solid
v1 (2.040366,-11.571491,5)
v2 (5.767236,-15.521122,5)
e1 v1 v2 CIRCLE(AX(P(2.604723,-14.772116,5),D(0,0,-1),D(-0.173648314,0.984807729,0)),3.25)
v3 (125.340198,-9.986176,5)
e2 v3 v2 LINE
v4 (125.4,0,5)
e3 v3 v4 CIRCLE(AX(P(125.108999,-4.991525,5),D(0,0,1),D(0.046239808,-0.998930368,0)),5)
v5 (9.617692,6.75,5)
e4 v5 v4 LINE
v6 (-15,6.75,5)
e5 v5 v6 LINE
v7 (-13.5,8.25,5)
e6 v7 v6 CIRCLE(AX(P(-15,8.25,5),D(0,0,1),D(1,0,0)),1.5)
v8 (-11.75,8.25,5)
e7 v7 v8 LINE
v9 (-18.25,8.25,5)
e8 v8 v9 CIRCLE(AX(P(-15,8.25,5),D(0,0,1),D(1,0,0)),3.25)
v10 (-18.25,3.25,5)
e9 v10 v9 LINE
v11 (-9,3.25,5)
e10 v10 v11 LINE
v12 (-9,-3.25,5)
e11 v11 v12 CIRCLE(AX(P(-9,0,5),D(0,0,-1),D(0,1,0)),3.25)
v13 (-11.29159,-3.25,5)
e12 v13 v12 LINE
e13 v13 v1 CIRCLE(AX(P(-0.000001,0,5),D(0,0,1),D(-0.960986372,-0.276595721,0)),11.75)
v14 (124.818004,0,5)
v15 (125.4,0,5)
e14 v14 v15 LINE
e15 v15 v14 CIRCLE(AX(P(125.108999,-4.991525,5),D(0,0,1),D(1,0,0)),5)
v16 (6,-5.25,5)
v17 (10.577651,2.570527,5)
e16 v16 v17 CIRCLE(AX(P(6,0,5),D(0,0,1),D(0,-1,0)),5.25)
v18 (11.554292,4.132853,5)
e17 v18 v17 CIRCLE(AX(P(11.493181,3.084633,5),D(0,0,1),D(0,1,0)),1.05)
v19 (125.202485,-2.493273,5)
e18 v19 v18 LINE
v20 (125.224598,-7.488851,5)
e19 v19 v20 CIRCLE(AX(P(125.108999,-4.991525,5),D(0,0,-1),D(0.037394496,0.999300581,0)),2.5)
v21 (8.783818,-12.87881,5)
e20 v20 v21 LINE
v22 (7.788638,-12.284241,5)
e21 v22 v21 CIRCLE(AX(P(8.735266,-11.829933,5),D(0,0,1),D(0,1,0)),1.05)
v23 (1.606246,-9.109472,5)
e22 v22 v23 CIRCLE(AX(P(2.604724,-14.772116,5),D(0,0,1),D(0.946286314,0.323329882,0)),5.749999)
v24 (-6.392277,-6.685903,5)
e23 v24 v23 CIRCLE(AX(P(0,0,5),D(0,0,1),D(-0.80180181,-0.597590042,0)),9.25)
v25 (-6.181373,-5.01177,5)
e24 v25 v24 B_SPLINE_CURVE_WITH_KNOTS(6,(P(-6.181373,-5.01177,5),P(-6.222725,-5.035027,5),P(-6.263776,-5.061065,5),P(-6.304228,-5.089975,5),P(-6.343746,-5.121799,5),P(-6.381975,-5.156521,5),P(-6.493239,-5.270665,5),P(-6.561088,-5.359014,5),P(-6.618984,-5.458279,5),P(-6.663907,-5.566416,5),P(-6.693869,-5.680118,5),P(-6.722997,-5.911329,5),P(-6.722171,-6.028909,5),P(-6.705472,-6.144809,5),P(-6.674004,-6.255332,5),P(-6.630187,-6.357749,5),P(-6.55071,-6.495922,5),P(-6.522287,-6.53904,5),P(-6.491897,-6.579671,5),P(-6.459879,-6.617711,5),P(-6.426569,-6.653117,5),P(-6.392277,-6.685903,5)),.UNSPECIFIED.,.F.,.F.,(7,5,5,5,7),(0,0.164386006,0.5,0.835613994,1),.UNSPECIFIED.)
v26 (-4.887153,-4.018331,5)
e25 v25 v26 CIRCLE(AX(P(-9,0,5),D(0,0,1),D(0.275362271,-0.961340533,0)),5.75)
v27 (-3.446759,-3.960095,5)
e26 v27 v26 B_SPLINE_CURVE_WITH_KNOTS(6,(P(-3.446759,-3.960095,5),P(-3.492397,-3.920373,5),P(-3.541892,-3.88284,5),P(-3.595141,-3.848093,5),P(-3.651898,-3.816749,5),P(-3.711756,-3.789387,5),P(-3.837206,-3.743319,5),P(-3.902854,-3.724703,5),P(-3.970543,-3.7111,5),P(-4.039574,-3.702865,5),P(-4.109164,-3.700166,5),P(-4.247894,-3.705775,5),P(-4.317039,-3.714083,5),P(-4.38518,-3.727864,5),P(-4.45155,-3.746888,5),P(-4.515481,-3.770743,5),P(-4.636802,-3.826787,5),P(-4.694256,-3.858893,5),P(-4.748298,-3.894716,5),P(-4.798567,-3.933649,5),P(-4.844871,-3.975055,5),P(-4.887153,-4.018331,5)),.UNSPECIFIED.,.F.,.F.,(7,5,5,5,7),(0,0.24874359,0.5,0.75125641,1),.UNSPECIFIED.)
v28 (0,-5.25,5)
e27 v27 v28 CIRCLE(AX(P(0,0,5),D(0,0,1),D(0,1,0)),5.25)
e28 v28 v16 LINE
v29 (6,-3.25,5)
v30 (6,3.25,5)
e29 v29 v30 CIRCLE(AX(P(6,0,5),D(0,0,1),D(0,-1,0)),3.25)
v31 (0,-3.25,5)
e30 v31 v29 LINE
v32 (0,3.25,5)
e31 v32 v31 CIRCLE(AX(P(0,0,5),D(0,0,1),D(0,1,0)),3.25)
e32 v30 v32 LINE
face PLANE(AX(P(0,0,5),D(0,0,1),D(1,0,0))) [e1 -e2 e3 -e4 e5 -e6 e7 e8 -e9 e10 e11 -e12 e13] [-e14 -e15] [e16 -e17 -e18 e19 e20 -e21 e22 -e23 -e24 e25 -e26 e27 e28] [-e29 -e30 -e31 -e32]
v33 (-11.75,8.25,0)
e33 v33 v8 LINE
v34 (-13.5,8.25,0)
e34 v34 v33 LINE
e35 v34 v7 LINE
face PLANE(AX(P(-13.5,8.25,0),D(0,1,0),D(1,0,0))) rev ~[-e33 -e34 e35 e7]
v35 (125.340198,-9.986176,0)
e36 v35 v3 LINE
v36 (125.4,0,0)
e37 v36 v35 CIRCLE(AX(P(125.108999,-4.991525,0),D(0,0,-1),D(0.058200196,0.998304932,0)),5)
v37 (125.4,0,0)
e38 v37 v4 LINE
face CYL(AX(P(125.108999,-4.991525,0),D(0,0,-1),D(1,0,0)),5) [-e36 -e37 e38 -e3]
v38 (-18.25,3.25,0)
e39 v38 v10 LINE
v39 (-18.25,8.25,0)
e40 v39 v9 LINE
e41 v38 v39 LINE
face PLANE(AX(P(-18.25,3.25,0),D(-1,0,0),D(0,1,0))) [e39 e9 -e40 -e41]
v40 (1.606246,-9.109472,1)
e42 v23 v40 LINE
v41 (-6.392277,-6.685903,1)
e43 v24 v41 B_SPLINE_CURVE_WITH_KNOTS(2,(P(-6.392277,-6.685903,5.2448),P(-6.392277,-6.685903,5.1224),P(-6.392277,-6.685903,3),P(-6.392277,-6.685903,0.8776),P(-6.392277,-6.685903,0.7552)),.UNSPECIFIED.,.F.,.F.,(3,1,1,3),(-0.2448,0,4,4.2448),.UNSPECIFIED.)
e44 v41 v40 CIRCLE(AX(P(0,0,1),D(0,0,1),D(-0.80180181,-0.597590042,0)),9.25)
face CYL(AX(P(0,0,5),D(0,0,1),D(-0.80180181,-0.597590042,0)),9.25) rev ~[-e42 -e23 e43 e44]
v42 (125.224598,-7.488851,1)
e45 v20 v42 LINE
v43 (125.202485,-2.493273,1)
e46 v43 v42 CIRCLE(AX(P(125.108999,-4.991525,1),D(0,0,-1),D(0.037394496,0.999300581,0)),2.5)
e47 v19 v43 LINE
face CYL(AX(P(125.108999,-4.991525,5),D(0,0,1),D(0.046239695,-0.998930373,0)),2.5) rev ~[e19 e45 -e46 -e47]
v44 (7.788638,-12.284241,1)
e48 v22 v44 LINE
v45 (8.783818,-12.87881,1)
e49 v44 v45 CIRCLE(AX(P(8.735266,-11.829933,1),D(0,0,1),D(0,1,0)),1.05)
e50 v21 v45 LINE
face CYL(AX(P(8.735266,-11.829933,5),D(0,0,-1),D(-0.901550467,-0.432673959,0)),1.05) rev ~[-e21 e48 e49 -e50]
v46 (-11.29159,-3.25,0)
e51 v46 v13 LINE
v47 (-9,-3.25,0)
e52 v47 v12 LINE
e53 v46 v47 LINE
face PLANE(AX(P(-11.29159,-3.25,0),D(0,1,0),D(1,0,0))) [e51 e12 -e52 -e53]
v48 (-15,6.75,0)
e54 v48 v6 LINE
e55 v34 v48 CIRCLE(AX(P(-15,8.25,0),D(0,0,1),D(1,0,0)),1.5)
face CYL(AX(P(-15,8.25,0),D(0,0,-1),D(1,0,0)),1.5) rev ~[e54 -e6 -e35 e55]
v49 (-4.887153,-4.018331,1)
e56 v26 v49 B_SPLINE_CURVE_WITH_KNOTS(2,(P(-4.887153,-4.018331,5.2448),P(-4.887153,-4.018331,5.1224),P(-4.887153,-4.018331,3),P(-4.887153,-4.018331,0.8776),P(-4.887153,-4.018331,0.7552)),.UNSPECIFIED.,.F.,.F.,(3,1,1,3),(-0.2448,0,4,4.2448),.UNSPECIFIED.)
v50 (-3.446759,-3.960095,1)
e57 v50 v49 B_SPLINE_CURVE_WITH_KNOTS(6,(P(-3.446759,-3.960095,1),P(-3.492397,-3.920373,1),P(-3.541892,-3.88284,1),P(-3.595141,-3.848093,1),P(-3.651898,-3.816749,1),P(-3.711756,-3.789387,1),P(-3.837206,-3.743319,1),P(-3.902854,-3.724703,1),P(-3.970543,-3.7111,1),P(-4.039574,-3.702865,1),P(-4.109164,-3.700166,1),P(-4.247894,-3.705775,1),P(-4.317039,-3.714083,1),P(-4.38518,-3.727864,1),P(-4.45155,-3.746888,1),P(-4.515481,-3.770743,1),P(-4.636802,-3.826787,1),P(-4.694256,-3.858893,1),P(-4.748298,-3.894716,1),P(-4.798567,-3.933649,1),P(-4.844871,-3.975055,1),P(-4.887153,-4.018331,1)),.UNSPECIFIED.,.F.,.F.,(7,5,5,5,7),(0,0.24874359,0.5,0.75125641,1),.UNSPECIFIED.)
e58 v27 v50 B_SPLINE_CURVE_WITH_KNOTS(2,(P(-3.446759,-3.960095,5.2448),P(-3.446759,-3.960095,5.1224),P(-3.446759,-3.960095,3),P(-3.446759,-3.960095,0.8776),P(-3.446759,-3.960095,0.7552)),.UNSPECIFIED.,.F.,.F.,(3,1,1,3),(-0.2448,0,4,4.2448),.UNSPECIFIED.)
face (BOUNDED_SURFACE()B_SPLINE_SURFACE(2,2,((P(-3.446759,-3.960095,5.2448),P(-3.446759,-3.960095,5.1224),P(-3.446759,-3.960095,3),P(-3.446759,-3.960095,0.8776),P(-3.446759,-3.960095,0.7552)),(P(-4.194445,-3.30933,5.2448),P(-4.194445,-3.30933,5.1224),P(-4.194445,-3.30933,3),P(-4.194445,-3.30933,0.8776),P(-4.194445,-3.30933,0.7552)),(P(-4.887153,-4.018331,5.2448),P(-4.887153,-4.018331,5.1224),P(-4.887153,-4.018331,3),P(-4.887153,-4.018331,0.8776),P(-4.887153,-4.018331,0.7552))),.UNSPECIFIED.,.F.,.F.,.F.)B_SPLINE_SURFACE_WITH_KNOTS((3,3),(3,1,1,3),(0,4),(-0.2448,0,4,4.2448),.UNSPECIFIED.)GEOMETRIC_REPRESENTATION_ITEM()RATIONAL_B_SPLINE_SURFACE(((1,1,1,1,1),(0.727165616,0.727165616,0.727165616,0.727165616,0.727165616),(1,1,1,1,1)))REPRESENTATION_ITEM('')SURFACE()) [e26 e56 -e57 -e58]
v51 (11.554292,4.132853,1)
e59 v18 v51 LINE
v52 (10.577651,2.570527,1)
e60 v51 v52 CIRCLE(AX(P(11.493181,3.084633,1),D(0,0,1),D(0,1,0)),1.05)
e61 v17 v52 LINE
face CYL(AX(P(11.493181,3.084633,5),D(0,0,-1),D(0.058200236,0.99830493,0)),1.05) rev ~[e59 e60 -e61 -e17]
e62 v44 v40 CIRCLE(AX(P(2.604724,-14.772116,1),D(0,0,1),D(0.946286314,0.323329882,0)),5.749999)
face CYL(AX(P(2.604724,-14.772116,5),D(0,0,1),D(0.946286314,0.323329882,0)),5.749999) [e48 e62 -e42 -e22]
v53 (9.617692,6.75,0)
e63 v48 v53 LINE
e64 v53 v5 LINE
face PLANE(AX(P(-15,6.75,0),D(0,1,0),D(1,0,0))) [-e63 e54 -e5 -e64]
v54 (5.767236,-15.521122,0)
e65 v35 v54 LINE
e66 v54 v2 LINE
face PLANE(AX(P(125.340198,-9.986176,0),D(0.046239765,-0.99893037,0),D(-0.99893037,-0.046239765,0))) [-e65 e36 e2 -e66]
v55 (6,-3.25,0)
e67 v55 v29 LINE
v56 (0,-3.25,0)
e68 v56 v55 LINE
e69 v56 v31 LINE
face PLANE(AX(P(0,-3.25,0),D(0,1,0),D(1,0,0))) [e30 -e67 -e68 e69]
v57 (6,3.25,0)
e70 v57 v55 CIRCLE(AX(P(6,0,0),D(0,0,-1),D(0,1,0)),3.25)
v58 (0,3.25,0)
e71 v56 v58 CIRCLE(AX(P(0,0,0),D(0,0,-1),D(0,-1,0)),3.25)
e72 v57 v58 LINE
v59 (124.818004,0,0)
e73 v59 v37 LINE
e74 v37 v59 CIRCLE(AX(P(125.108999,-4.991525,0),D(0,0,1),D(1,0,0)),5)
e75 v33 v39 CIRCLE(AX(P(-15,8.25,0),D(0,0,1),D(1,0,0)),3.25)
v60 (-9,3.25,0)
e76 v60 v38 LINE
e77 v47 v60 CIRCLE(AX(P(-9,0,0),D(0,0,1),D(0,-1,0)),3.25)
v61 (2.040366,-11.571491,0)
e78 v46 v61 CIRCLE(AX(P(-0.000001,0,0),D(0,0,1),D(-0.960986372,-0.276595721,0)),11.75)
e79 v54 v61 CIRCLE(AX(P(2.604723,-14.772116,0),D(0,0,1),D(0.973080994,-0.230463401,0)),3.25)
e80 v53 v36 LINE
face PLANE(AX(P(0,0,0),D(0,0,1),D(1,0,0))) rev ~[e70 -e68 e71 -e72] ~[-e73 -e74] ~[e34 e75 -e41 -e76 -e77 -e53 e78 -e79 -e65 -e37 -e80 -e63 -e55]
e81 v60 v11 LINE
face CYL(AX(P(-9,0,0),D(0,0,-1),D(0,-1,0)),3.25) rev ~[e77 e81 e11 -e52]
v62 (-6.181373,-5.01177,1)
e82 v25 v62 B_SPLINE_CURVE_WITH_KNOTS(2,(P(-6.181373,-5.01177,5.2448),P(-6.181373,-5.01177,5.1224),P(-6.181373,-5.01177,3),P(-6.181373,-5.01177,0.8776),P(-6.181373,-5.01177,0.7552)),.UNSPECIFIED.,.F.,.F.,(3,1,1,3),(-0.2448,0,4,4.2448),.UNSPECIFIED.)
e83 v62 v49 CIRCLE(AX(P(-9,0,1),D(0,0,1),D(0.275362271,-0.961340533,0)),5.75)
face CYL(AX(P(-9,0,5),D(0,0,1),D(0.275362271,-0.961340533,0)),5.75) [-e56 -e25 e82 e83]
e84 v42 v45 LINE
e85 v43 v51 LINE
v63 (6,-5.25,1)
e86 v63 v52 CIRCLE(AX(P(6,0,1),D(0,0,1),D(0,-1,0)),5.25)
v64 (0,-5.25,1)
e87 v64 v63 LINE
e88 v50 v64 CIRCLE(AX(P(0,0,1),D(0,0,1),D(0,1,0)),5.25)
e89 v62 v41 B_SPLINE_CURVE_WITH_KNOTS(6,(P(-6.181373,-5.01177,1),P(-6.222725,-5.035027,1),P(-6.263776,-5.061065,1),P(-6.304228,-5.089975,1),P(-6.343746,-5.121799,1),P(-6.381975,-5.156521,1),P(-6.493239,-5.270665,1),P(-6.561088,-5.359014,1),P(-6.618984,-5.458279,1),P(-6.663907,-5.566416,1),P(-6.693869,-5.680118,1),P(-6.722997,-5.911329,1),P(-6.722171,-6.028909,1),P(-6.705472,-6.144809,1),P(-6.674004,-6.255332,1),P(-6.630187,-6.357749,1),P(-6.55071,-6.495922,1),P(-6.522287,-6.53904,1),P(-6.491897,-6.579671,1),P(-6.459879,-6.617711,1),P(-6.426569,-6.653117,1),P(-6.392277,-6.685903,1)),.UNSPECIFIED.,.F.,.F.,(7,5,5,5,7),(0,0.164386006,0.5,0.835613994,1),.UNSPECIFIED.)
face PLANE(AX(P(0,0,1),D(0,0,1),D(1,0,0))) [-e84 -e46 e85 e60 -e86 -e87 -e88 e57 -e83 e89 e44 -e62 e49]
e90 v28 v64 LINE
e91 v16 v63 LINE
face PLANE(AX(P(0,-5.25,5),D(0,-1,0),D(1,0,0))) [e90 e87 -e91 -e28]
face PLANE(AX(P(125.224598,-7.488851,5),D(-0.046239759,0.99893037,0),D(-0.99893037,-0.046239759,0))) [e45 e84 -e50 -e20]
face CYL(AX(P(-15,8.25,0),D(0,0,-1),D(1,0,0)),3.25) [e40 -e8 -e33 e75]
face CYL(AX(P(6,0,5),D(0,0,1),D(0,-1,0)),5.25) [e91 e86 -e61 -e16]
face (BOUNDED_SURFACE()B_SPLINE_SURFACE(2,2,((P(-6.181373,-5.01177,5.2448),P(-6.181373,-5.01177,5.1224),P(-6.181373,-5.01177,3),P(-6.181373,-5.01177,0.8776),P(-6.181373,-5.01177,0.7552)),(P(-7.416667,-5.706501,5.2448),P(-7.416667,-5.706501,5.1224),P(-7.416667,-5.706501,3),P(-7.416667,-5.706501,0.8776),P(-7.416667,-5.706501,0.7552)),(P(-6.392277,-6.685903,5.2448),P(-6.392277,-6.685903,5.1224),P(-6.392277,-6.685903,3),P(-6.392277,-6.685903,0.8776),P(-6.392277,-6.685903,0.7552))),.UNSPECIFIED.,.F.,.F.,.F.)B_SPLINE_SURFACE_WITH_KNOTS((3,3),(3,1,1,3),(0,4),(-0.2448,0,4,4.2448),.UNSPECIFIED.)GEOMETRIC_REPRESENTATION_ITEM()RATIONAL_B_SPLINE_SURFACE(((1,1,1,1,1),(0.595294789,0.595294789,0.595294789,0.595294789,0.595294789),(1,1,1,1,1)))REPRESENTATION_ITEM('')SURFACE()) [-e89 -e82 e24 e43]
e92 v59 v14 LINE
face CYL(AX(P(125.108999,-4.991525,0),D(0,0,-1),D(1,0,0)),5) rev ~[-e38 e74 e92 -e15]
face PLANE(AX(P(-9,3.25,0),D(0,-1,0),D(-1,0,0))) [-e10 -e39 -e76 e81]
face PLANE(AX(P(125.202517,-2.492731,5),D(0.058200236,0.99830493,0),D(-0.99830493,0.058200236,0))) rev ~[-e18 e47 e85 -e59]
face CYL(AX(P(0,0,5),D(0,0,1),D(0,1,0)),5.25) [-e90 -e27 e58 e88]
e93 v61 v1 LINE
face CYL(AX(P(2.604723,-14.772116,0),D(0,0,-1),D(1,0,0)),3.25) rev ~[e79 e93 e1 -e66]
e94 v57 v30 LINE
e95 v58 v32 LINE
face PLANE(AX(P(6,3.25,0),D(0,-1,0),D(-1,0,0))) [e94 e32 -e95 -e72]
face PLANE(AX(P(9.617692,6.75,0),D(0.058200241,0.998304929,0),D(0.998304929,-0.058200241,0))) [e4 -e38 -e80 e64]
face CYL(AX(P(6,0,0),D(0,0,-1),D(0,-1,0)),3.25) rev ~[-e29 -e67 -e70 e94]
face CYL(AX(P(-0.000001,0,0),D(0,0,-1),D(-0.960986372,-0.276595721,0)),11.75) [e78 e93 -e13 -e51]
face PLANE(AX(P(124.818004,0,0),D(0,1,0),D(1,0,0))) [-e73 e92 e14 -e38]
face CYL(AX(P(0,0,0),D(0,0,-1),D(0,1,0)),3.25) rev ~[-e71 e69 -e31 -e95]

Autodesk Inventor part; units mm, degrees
ref_plane "YZ Plane" through (0, 0, 0) normal (1, 0, 0) x (0, 1, 0)
ref_plane "XZ Plane" through (0, 0, 0) normal (0, 1, 0) x (-1, 0, 0)
ref_plane "XY Plane" through (0, 0, 0) normal (0, 0, 1) x (1, 0, 0)
sketch "スケッチ1" plane through (0, 0, 0) normal (0, 0, 1) x (1, 0, 0)
  line L0 (0, 0) -> (6, 0) construction
  line L1 (0, -3.25) -> (6, -3.25)
  line L2 (6, 3.25) -> (0, 3.25)
  arc A0 (0, 3.25) -> (0, -3.25) centre (0, 0) ccw
  arc A1 (6, -3.25) -> (6, 3.25) centre (6, 0) ccw
  line L3 (-15, 0) -> (-9, 0) construction
  line L4 (-9, 3.25) -> (-15, 3.25)
  arc A2 (-15, 3.25) -> (-18.25, 0) centre (-15, 0) ccw
  arc A3 (-9, -3.25) -> (-9, 3.25) centre (-9, 0) ccw
  line L5 (-9, 0) -> (0, 0)
  circle A4 centre (-15, 0) radius 3.25 construction
  circle A5 centre (2.604723, -14.772116) radius 3.25
  line L6 (0, 0) -> (2.604723, -14.772116) construction
  arc A6 (-11.29159, -3.25) -> (2.040366, -11.571491) centre (0, 0) ccw
  line L7 (0, 0) -> (125.4, 0)
  line L8 (125.340198, -9.986176) -> (5.767236, -15.521122)
  line L9 (-11.29159, -3.25) -> (-9, -3.25)
  arc A7 (-13.5, 8.25) -> (-15, 6.75) centre (-15, 8.25) ccw
  line L10 (-15, 8.25) -> (-15, 6.75) construction
  line L11 (-15, 3.25) -> (-18.25, 3.25)
  line L12 (-18.25, 3.25) -> (-18.25, 8.25)
  line L13 (-13.5, 8.25) -> (-11.75, 8.25)
  line L14 (-15, 6.75) -> (-9.617692, 6.75)
  arc A8 (-11.75, 0) -> (-11.29159, -3.25) centre (0, 0) ccw
  arc A9 (2.040366, -11.571491) -> (-11.75, 0) centre (0, 0) ccw construction
  line L15 (9.617692, 6.75) -> (125.4, 0)
  line L16 (-9.617692, 6.75) -> (9.617692, 6.75)
  line L17 (-15, 6.75) -> (-15, 0) construction
  arc A10 (-11.75, 8.25) -> (-18.25, 8.25) centre (-15, 8.25) ccw
  circle A11 centre (125.108999, -4.991525) radius 5
  point P0 (3, 0)
  point P1 (-12, 0)
  point P2 (2.040366, -11.571491)
  point P3 (124.817998, 0)
  dimension "d6" = 6.5
  dimension "d7" = 6.5
  dimension "d0" = 6.5
  dimension "d1" = 6
  dimension "d3" = 6.5
  dimension "d4" = 6
  dimension "d5" = 15
  dimension "d8" = 15
  dimension "d9" = 100
  dimension "d11" = 125.4
  dimension "d12" = 3
  dimension "d13" = 5
  dimension "d14" = 3.25
  dimension "d15" = 6.5
  dimension "d18" = 10
extrude "押し出し1" add sketch "スケッチ1" along normal blind 5 contours L1 A1 L7 A11 L8 A5 A6 L9 A3 L5 A0 | L5 A3 L4 L11 L12 A10 L13 A7 L14 L16 L15 A11 L7 A1 L2 A0 | L7 A11 picked at (123.673178, -4.767327)
sketch "スケッチ2" plane through (0, 0, 5) normal (0, 0, 1) x (1, 0, 0)
  arc A0 (-15, 6.75) -> (-13.5, 8.25) centre (-15, 8.25) ccw
  line L0 (-13.5, 8.25) -> (-11.75, 8.25)
  arc A1 (-11.75, 8.25) -> (-18.25, 8.25) centre (-15, 8.25) ccw
  line L1 (-18.25, 8.25) -> (-18.25, 3.25)
  arc A2 (-9, 3.25) -> (-9, -3.25) centre (-9, 0) ccw
  line L2 (-9, -3.25) -> (-11.29159, -3.25)
  arc A3 (-11.29159, -3.25) -> (2.040366, -11.571491) centre (0, 0) ccw
  arc A4 (2.040366, -11.571491) -> (5.767236, -15.521122) centre (2.604723, -14.772116) ccw
  line L3 (5.767236, -15.521122) -> (125.340198, -9.986176)
  arc A5 (125.340198, -9.986176) -> (125.4, 0) centre (125.108999, -4.991525) ccw
  line L4 (125.4, 0) -> (124.817998, 0)
  line L5 (124.817998, 0) -> (125.4, 0)
  line L6 (125.4, 0) -> (9.617692, 6.75)
  line L7 (0, 3.25) -> (6, 3.25)
  arc A6 (6, 3.25) -> (6, -3.25) centre (6, 0) ccw
  line L8 (6, -3.25) -> (0, -3.25)
  arc A7 (0, -3.25) -> (0, 3.25) centre (0, 0) ccw
  arc A8 (125.224598, -7.488851) -> (125.202485, -2.493273) centre (125.108999, -4.991525) ccw
  line L9 (125.224598, -7.488851) -> (8.045869, -12.912969)
  arc A9 (8.045869, -12.912969) -> (1.606246, -9.109472) centre (2.604723, -14.772116) ccw
  arc A10 (-7.416667, -5.527708) -> (1.606246, -9.109472) centre (0, 0) ccw
  arc A11 (-7.416667, -5.527708) -> (-9, 5.75) centre (-9, 0) ccw
  line L10 (125.254499, -2.495762) -> (9.041316, 4.279357)
  line L11 (6, 5.25) -> (0, 5.25)
  arc A12 (0, 5.25) -> (0, -5.25) centre (0, 0) ccw
  line L12 (0, -5.25) -> (6, -5.25)
  arc A13 (6, -5.25) -> (6, 5.25) centre (6, 0) ccw
  point P0 (-4.194444, -3.157394)
  point P1 (125.254499, -2.495762)
  point P2 (9.678702, 3.745617)
  point P3 (-4.194444, 3.157394)
  dimension "d19" = 2.5
  dimension "d20" = 2.5
  dimension "d21" = 2
extrude "押し出し2" cut sketch "スケッチ2" against normal blind 4 contours L9 A9 A10 A11 A12 L12 A13 L10 A8
fillet "フィレット1" radius 1.05 4 edges at (8.0459, -12.913, 3) (-7.4167, -5.5277, 3) (-4.1944, -3.1574, 3) (9.0413, 4.2794, 3)
properties part number "ウィング" material "ポリカーボネート、クリア"
